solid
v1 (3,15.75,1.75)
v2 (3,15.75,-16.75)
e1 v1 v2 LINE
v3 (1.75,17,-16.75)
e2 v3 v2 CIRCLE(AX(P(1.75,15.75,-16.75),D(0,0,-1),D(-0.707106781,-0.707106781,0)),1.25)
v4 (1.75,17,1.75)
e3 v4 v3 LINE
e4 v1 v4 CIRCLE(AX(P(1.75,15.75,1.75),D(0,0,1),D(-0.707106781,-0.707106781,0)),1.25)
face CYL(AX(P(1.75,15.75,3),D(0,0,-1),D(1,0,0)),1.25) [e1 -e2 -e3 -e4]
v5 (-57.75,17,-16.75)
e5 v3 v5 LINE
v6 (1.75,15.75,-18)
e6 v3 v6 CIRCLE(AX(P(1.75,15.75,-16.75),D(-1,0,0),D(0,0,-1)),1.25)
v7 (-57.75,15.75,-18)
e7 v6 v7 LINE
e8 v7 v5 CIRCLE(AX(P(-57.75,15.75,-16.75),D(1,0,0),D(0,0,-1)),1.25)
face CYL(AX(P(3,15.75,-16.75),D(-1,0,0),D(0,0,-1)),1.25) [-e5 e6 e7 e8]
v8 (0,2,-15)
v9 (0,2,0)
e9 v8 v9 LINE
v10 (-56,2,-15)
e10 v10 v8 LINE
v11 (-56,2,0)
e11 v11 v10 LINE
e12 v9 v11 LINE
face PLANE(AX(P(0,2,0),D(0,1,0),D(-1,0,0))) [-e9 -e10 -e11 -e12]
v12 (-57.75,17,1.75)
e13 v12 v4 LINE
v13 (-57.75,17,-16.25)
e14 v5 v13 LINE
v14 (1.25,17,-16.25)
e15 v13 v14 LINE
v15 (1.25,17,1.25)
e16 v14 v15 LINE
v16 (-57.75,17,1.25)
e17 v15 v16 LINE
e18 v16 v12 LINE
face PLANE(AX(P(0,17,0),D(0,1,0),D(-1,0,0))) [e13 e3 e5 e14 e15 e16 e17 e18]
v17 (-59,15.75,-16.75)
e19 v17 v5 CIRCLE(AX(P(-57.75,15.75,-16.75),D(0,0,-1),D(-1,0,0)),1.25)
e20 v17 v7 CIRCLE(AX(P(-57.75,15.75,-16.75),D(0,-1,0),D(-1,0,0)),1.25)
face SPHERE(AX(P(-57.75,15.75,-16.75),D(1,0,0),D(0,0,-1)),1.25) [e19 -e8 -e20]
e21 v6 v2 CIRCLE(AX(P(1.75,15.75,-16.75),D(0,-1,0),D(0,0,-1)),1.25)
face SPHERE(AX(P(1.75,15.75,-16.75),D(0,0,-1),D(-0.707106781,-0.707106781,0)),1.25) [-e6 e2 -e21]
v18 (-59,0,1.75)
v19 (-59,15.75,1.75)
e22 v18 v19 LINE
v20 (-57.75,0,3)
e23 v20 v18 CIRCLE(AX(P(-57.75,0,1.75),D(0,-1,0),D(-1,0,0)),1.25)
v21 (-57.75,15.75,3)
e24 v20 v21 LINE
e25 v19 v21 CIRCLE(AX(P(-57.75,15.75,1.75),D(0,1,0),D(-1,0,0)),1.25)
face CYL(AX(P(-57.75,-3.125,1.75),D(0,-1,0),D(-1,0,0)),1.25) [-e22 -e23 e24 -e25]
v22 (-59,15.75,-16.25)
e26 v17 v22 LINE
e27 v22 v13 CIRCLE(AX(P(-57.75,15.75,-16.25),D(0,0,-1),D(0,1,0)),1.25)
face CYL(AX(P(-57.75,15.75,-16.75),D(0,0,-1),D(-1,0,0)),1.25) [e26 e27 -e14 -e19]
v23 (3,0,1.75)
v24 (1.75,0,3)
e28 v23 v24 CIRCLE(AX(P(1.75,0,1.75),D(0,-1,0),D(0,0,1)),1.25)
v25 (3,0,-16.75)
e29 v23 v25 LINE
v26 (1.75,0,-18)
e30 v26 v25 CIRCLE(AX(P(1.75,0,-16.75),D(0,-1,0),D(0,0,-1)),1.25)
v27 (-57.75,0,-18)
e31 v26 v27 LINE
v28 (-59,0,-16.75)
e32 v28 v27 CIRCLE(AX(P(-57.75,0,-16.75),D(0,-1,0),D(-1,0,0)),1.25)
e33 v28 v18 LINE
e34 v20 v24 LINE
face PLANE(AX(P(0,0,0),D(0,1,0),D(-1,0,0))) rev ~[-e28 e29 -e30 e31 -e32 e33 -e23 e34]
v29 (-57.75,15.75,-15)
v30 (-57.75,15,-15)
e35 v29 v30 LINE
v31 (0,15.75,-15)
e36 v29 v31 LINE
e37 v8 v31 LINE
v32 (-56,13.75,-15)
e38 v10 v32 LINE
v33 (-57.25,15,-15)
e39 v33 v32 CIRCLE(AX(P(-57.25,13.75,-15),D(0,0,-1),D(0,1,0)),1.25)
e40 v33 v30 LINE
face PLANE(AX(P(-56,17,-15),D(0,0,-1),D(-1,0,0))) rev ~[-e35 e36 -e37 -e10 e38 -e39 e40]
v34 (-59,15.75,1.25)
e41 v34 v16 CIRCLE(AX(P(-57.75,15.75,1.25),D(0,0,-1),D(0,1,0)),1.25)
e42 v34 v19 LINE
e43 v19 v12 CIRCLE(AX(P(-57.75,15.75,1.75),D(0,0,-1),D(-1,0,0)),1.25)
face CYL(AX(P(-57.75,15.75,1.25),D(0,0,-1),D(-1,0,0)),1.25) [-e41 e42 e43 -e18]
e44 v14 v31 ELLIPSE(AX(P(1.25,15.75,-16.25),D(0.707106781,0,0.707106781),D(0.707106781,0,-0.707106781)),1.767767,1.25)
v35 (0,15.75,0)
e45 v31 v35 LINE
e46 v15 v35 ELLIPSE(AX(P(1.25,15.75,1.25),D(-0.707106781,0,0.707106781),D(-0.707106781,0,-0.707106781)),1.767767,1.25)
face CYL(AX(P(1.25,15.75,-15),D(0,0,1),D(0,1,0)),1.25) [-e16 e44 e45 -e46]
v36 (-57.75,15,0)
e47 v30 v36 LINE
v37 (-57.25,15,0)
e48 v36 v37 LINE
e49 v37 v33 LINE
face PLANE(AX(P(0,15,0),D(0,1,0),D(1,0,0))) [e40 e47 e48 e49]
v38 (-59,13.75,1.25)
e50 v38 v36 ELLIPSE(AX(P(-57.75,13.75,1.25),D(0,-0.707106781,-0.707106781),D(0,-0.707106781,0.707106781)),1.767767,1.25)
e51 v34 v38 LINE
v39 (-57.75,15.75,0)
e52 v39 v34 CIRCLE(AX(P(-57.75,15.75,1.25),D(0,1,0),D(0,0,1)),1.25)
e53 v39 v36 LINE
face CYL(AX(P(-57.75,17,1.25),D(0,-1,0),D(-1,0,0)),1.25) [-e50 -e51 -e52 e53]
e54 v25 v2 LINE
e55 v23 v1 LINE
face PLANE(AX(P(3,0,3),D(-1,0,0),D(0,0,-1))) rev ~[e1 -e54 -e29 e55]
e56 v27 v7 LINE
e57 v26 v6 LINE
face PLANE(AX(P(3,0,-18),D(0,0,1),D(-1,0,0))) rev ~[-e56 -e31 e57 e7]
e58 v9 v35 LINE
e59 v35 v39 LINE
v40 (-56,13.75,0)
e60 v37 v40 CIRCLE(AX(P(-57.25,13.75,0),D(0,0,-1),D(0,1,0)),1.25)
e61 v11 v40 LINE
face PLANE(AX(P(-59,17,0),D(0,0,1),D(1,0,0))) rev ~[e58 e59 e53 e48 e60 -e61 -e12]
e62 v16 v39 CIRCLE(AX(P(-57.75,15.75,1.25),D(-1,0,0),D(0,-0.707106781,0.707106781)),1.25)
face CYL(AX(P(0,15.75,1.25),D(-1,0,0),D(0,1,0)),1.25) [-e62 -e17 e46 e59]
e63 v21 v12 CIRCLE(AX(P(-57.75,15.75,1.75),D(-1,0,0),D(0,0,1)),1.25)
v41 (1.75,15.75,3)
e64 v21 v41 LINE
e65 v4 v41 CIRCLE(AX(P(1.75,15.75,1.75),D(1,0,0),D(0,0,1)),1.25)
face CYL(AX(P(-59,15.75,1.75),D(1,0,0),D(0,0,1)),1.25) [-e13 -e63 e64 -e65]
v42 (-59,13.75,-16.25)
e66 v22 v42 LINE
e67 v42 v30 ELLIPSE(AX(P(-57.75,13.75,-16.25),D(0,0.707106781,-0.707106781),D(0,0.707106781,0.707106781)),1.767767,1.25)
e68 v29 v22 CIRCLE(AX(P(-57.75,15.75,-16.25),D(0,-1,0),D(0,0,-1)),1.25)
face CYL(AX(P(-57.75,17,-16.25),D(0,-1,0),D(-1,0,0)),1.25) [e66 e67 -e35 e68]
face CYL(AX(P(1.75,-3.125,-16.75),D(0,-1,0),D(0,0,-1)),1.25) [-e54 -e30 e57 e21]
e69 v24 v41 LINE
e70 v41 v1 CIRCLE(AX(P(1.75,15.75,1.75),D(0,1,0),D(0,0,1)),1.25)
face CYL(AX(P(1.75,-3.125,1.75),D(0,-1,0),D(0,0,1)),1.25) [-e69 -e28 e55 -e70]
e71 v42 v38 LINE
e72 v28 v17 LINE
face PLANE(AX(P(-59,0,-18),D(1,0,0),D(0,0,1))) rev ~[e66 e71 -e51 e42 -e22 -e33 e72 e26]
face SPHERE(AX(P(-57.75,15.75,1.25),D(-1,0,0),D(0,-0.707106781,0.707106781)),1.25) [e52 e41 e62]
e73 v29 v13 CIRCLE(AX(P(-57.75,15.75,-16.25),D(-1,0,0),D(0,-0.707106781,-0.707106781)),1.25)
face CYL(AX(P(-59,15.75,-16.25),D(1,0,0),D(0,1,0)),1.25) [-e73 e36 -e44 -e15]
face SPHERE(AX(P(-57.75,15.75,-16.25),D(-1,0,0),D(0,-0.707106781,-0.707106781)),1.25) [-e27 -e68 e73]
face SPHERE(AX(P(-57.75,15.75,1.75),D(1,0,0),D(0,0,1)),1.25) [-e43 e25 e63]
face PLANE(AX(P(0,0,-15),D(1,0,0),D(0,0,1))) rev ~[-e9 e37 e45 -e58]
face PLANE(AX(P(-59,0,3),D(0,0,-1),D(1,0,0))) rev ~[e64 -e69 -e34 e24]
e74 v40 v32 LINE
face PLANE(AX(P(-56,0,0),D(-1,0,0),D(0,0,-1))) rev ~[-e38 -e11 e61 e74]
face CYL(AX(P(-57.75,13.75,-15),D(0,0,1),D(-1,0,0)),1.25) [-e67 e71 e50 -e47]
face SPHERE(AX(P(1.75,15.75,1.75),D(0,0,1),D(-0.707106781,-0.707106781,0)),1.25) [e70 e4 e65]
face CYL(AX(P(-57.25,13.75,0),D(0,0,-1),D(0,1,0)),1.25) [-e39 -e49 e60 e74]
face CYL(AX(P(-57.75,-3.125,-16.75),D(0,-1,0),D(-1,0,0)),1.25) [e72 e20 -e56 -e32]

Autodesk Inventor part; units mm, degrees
ref_plane "YZ Plane" through (0, 0, 0) normal (1, 0, 0) x (0, 1, 0)
ref_plane "XZ Plane" through (0, 0, 0) normal (0, 1, 0) x (-1, 0, 0)
ref_plane "XY Plane" through (0, 0, 0) normal (0, 0, 1) x (1, 0, 0)
sketch "Sketch1" plane through (0, 0, 0) normal (0, 1, 0) x (-1, 0, 0)
  line L0 (0, 0) -> (56, 0)
  line L1 (56, 0) -> (56, -15)
  line L2 (56, -15) -> (0, -15)
  line L3 (0, -15) -> (0, 0)
  line L4 (59, 3) -> (-3, 3)
  line L5 (-3, 3) -> (-3, -18)
  line L6 (-3, -18) -> (59, -18)
  line L7 (59, -18) -> (59, 3)
  dimension "d0" = 56
  dimension "d1" = 15
  dimension "d2" = 3
  dimension "d3" = 3
  dimension "d4" = 3
  dimension "d5" = 3
extrude "Extrusion1" add sketch "Sketch1" along normal blind 2 contours L0 L1 L2 L3
extrude "Extrusion2" add sketch "Sketch1" along normal blind 17
sketch "Sketch2" plane through (0, 17, 0) normal (0, 1, 0) x (1, 0, 0)
  line L0 (-56, 15) -> (0, 15) projected
  line L1 (-59, 18) -> (-59, -3) projected
  line L2 (-56, 15) -> (-59, 15)
  line L3 (-59, 15) -> (-59, 0)
  line L4 (-59, 0) -> (-56, 0)
  line L5 (-56, 0) -> (-56, 15)
  point P0 (0, 0)
extrude "Extrusion3" cut sketch "Sketch2" against normal blind 2
fillet "Fillet1" radius 1.25 10 edges at (-29.5, 17, -15) (-29.5, 17, 0) (-28, 17, -18) (-28, 17, 3) (0, 17, -7.5) (3, 17, -7.5) (-59, 15, -7.5) (-56, 15, -7.5) (-59, 16, -15) (-59, 16, 0)
fillet "Fillet2" radius 1.25 12 edges at (-59, 16.6339, 2.6339) (-59, 17, 1.5) (-58.6339, 16.6339, 0.3661) (-59, 7.875, 3) (-59, 16.6339, -17.6339) (-59, 17, -16.5) (-58.6339, 16.6339, -15.3661) (-59, 7.875, -18) (2.6339, 16.6339, 2.6339) (3, 7.875, 3) (2.6339, 16.6339, -17.6339) (3, 7.875, -18)
properties part number "battery_compartment"
